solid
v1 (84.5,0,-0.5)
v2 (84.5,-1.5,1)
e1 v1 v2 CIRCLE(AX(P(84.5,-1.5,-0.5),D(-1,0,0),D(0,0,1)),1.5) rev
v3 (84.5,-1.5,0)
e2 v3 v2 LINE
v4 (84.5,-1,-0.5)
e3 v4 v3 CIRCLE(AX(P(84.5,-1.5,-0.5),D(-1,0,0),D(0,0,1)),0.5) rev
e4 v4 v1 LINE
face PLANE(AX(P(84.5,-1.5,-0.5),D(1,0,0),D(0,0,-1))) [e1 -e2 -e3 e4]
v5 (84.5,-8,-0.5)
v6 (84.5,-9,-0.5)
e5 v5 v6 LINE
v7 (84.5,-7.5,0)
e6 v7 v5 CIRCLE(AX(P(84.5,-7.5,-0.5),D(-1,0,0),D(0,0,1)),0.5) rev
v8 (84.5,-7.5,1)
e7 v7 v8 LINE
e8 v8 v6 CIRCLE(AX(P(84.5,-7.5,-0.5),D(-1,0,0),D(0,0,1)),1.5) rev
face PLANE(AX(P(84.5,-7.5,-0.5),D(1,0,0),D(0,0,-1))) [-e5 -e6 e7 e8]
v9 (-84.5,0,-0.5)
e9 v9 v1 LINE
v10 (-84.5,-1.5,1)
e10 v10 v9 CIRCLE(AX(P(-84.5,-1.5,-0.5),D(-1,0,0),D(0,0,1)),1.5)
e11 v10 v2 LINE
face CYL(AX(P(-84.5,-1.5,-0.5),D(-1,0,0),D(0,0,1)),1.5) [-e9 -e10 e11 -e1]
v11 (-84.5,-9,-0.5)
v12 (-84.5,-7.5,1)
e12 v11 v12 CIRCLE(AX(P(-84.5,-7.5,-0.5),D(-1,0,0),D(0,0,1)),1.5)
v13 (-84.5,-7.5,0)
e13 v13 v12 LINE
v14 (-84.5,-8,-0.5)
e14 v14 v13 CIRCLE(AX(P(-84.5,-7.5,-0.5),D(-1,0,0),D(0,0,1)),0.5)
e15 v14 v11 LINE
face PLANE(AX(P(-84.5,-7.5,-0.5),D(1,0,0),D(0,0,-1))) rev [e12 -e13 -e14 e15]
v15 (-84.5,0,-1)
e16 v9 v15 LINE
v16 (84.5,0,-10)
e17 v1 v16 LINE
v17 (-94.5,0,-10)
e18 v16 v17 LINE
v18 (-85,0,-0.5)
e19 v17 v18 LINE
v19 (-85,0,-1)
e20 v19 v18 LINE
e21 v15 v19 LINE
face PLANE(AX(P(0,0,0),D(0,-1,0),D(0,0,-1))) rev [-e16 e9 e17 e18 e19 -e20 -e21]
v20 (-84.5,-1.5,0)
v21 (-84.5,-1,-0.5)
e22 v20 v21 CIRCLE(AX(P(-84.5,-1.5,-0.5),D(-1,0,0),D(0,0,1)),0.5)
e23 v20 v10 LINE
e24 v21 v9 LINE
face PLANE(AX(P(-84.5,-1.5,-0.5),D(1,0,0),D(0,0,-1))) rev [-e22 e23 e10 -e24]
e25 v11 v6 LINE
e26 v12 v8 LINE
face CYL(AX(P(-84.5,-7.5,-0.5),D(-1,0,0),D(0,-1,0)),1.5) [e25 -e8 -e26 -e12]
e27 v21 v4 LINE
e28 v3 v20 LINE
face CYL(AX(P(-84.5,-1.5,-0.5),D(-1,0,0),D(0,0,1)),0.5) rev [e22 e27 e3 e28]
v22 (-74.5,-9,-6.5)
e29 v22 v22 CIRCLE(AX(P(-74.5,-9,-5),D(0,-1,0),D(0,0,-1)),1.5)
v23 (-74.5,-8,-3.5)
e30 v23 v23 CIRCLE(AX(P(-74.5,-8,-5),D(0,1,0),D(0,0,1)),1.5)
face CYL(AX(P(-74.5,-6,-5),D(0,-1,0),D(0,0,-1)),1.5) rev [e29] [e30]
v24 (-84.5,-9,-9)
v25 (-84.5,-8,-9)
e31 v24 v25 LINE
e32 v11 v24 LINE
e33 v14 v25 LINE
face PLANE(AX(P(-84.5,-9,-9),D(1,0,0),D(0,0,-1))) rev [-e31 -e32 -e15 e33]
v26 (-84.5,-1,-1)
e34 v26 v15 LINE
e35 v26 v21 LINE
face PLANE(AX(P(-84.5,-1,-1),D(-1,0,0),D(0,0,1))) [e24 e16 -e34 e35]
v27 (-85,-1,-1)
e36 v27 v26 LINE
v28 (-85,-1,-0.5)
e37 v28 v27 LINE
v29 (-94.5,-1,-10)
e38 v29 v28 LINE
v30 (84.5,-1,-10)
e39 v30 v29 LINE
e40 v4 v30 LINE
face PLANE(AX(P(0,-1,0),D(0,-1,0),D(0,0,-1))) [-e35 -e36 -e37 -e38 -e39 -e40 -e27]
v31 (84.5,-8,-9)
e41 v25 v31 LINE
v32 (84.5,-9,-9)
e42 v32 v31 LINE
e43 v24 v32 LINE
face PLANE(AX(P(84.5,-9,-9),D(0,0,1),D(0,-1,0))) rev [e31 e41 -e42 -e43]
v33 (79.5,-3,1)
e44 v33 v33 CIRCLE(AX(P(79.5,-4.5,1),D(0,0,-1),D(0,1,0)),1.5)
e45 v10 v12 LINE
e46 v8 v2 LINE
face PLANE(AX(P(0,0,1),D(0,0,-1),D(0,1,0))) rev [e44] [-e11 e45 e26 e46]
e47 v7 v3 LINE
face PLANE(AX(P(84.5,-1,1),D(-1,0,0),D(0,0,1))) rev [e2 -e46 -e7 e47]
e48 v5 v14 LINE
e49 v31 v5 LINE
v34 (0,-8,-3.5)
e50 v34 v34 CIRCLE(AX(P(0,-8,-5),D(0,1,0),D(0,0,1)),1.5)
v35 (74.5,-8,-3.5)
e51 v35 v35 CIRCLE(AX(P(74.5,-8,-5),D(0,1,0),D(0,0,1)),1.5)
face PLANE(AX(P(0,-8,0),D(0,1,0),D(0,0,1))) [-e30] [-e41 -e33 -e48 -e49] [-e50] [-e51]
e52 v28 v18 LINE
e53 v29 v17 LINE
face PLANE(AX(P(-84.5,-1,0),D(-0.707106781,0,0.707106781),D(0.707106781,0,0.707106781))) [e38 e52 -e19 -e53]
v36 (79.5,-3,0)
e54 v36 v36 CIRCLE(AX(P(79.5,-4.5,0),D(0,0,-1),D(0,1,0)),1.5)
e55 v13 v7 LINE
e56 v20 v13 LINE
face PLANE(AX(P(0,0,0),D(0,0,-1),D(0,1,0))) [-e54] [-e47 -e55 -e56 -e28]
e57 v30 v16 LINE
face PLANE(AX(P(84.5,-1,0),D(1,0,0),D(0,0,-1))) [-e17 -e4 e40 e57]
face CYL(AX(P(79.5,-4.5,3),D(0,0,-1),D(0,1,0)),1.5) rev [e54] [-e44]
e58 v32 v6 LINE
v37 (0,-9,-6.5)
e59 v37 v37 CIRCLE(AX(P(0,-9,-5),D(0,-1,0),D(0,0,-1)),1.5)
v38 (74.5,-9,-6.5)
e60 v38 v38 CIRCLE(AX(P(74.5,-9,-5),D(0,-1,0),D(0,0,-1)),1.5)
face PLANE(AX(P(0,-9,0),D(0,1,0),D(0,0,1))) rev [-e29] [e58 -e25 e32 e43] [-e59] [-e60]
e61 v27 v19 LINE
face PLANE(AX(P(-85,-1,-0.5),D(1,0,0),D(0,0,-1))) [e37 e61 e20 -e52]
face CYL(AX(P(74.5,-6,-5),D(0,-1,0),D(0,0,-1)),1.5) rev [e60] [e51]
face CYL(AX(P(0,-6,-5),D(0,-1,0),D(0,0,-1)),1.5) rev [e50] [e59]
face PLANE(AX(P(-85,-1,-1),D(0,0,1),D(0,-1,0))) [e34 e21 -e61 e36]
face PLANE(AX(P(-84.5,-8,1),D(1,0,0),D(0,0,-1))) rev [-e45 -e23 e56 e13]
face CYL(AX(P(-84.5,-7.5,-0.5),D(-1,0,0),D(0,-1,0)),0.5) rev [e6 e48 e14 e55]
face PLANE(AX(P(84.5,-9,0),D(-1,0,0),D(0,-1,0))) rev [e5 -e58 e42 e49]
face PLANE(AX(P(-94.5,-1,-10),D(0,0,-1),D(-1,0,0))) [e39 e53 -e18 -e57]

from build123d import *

# Parameters (mm, degrees)
BASE_FLANGE1_DEPTH            = 1
EDGE_FLANGE1_STRIP_W          = 5
EDGE_FLANGE1_STRIP_H          = 1
EDGE_FLANGE1_STRIP_CUT_DEPTH  = 169
EDGE_FLANGE1_RELIEF_W         = 5.5
EDGE_FLANGE1_RELIEF_H         = 0.5
EDGE_FLANGE1_RELIEF_CUT_DEPTH = 1
EDGE_FLANGE1_DEPTH            = 169
EDGE_FLANGE2_STRIP_W          = 5
EDGE_FLANGE2_STRIP_H          = 1
EDGE_FLANGE2_STRIP_CUT_DEPTH  = 169
EDGE_FLANGE2_DEPTH            = 169
SKETCH12_R                    = 1.5
CUT_EXTRUDE1_DEPTH            = 3
SKETCH13_R                    = 1.5
CUT_EXTRUDE2_DEPTH            = 3


# Sheet-metal steps are written as plain solids
with BuildPart() as part:
    # Sketch1 → Base-Flange1 (new body)
    with BuildSketch(Plane(origin=(0, 0, 0), x_dir=(1, 0, 0), z_dir=(0, 1, 0))):
        Polygon((-84.5, 0), (84.5, 0), (84.5, 10), (-94.5, 10), align=None)
    extrude(amount=-BASE_FLANGE1_DEPTH)

    # Edge-Flange1 strip (across the edge) → Edge-Flange1 strip cut (cut)
    with BuildSketch(Plane(origin=(84.5, -1, 0), x_dir=(0, 0, -1), z_dir=(-1, 0, 0))):
        with Locations((-2, -0.5)):
            Rectangle(EDGE_FLANGE1_STRIP_W, EDGE_FLANGE1_STRIP_H)
    extrude(amount=EDGE_FLANGE1_STRIP_CUT_DEPTH, mode=Mode.SUBTRACT)

    # Edge-Flange1 relief (on the sheet) → Edge-Flange1 relief cut (cut)
    with BuildSketch(Plane(origin=(84.5, -1, -0.5), x_dir=(0, 0, -1), z_dir=(0, -1, 0))):
        with Locations((-2.25, -169.25)):
            Rectangle(EDGE_FLANGE1_RELIEF_W, EDGE_FLANGE1_RELIEF_H)
    extrude(amount=-EDGE_FLANGE1_RELIEF_CUT_DEPTH, mode=Mode.SUBTRACT)

    # Edge-Flange1 section (across the edge) → Edge-Flange1 (add)
    with BuildSketch(Plane(origin=(84.5, -1, 0), x_dir=(0, 0, -1), z_dir=(-1, 0, 0))):
        with BuildLine():
            Line((-1, 0.5), (-1, 7))
            Line((-1, 7), (0, 7))
            Line((0, 7), (0, 0.5))
            ThreePointArc((0, 0.5), (0.146446609, 0.146446609), (0.5, 0))
            Line((0.5, 0), (0.5, -1))
            ThreePointArc((0.5, -1), (-0.560660172, -0.560660172), (-1, 0.5))
        make_face()
    extrude(amount=EDGE_FLANGE1_DEPTH)

    # Edge-Flange2 strip (across the edge) → Edge-Flange2 strip cut (cut)
    with BuildSketch(Plane(origin=(84.5, -8, 0), x_dir=(0, 1, 0), z_dir=(-1, 0, 0))):
        with Locations((-2, -0.5)):
            Rectangle(EDGE_FLANGE2_STRIP_W, EDGE_FLANGE2_STRIP_H)
    extrude(amount=EDGE_FLANGE2_STRIP_CUT_DEPTH, mode=Mode.SUBTRACT)

    # Edge-Flange2 section (across the edge) → Edge-Flange2 (add)
    with BuildSketch(Plane(origin=(84.5, -8, 0), x_dir=(0, 1, 0), z_dir=(-1, 0, 0))):
        with BuildLine():
            Line((-1, 0.5), (-1, 9))
            Line((-1, 9), (0, 9))
            Line((0, 9), (0, 0.5))
            ThreePointArc((0, 0.5), (0.146446609, 0.146446609), (0.5, 0))
            Line((0.5, 0), (0.5, -1))
            ThreePointArc((0.5, -1), (-0.560660172, -0.560660172), (-1, 0.5))
        make_face()
    extrude(amount=EDGE_FLANGE2_DEPTH)

    # Sketch12 → Cut-Extrude1 (cut)
    with BuildSketch(Plane.XZ.offset(9)):
        with Locations(Location((-74.5, -5, 0), (0, 0, 270))):
            Circle(SKETCH12_R)
        with Locations(Location((0, -5, 0), (0, 0, 270))):
            Circle(SKETCH12_R)
        with Locations(Location((74.5, -5, 0), (0, 0, 270))):
            Circle(SKETCH12_R)
    extrude(amount=-CUT_EXTRUDE1_DEPTH, mode=Mode.SUBTRACT)

    # Sketch13 → Cut-Extrude2 (cut)
    with BuildSketch(Plane(origin=(0, 0, 0), x_dir=(-1, 0, 0), z_dir=(0, 0, -1))):
        with Locations(Location((-79.5, -4.5, 0), (0, 0, 90))):
            Circle(SKETCH13_R)
    extrude(amount=-CUT_EXTRUDE2_DEPTH, mode=Mode.SUBTRACT)


solid = part.part
